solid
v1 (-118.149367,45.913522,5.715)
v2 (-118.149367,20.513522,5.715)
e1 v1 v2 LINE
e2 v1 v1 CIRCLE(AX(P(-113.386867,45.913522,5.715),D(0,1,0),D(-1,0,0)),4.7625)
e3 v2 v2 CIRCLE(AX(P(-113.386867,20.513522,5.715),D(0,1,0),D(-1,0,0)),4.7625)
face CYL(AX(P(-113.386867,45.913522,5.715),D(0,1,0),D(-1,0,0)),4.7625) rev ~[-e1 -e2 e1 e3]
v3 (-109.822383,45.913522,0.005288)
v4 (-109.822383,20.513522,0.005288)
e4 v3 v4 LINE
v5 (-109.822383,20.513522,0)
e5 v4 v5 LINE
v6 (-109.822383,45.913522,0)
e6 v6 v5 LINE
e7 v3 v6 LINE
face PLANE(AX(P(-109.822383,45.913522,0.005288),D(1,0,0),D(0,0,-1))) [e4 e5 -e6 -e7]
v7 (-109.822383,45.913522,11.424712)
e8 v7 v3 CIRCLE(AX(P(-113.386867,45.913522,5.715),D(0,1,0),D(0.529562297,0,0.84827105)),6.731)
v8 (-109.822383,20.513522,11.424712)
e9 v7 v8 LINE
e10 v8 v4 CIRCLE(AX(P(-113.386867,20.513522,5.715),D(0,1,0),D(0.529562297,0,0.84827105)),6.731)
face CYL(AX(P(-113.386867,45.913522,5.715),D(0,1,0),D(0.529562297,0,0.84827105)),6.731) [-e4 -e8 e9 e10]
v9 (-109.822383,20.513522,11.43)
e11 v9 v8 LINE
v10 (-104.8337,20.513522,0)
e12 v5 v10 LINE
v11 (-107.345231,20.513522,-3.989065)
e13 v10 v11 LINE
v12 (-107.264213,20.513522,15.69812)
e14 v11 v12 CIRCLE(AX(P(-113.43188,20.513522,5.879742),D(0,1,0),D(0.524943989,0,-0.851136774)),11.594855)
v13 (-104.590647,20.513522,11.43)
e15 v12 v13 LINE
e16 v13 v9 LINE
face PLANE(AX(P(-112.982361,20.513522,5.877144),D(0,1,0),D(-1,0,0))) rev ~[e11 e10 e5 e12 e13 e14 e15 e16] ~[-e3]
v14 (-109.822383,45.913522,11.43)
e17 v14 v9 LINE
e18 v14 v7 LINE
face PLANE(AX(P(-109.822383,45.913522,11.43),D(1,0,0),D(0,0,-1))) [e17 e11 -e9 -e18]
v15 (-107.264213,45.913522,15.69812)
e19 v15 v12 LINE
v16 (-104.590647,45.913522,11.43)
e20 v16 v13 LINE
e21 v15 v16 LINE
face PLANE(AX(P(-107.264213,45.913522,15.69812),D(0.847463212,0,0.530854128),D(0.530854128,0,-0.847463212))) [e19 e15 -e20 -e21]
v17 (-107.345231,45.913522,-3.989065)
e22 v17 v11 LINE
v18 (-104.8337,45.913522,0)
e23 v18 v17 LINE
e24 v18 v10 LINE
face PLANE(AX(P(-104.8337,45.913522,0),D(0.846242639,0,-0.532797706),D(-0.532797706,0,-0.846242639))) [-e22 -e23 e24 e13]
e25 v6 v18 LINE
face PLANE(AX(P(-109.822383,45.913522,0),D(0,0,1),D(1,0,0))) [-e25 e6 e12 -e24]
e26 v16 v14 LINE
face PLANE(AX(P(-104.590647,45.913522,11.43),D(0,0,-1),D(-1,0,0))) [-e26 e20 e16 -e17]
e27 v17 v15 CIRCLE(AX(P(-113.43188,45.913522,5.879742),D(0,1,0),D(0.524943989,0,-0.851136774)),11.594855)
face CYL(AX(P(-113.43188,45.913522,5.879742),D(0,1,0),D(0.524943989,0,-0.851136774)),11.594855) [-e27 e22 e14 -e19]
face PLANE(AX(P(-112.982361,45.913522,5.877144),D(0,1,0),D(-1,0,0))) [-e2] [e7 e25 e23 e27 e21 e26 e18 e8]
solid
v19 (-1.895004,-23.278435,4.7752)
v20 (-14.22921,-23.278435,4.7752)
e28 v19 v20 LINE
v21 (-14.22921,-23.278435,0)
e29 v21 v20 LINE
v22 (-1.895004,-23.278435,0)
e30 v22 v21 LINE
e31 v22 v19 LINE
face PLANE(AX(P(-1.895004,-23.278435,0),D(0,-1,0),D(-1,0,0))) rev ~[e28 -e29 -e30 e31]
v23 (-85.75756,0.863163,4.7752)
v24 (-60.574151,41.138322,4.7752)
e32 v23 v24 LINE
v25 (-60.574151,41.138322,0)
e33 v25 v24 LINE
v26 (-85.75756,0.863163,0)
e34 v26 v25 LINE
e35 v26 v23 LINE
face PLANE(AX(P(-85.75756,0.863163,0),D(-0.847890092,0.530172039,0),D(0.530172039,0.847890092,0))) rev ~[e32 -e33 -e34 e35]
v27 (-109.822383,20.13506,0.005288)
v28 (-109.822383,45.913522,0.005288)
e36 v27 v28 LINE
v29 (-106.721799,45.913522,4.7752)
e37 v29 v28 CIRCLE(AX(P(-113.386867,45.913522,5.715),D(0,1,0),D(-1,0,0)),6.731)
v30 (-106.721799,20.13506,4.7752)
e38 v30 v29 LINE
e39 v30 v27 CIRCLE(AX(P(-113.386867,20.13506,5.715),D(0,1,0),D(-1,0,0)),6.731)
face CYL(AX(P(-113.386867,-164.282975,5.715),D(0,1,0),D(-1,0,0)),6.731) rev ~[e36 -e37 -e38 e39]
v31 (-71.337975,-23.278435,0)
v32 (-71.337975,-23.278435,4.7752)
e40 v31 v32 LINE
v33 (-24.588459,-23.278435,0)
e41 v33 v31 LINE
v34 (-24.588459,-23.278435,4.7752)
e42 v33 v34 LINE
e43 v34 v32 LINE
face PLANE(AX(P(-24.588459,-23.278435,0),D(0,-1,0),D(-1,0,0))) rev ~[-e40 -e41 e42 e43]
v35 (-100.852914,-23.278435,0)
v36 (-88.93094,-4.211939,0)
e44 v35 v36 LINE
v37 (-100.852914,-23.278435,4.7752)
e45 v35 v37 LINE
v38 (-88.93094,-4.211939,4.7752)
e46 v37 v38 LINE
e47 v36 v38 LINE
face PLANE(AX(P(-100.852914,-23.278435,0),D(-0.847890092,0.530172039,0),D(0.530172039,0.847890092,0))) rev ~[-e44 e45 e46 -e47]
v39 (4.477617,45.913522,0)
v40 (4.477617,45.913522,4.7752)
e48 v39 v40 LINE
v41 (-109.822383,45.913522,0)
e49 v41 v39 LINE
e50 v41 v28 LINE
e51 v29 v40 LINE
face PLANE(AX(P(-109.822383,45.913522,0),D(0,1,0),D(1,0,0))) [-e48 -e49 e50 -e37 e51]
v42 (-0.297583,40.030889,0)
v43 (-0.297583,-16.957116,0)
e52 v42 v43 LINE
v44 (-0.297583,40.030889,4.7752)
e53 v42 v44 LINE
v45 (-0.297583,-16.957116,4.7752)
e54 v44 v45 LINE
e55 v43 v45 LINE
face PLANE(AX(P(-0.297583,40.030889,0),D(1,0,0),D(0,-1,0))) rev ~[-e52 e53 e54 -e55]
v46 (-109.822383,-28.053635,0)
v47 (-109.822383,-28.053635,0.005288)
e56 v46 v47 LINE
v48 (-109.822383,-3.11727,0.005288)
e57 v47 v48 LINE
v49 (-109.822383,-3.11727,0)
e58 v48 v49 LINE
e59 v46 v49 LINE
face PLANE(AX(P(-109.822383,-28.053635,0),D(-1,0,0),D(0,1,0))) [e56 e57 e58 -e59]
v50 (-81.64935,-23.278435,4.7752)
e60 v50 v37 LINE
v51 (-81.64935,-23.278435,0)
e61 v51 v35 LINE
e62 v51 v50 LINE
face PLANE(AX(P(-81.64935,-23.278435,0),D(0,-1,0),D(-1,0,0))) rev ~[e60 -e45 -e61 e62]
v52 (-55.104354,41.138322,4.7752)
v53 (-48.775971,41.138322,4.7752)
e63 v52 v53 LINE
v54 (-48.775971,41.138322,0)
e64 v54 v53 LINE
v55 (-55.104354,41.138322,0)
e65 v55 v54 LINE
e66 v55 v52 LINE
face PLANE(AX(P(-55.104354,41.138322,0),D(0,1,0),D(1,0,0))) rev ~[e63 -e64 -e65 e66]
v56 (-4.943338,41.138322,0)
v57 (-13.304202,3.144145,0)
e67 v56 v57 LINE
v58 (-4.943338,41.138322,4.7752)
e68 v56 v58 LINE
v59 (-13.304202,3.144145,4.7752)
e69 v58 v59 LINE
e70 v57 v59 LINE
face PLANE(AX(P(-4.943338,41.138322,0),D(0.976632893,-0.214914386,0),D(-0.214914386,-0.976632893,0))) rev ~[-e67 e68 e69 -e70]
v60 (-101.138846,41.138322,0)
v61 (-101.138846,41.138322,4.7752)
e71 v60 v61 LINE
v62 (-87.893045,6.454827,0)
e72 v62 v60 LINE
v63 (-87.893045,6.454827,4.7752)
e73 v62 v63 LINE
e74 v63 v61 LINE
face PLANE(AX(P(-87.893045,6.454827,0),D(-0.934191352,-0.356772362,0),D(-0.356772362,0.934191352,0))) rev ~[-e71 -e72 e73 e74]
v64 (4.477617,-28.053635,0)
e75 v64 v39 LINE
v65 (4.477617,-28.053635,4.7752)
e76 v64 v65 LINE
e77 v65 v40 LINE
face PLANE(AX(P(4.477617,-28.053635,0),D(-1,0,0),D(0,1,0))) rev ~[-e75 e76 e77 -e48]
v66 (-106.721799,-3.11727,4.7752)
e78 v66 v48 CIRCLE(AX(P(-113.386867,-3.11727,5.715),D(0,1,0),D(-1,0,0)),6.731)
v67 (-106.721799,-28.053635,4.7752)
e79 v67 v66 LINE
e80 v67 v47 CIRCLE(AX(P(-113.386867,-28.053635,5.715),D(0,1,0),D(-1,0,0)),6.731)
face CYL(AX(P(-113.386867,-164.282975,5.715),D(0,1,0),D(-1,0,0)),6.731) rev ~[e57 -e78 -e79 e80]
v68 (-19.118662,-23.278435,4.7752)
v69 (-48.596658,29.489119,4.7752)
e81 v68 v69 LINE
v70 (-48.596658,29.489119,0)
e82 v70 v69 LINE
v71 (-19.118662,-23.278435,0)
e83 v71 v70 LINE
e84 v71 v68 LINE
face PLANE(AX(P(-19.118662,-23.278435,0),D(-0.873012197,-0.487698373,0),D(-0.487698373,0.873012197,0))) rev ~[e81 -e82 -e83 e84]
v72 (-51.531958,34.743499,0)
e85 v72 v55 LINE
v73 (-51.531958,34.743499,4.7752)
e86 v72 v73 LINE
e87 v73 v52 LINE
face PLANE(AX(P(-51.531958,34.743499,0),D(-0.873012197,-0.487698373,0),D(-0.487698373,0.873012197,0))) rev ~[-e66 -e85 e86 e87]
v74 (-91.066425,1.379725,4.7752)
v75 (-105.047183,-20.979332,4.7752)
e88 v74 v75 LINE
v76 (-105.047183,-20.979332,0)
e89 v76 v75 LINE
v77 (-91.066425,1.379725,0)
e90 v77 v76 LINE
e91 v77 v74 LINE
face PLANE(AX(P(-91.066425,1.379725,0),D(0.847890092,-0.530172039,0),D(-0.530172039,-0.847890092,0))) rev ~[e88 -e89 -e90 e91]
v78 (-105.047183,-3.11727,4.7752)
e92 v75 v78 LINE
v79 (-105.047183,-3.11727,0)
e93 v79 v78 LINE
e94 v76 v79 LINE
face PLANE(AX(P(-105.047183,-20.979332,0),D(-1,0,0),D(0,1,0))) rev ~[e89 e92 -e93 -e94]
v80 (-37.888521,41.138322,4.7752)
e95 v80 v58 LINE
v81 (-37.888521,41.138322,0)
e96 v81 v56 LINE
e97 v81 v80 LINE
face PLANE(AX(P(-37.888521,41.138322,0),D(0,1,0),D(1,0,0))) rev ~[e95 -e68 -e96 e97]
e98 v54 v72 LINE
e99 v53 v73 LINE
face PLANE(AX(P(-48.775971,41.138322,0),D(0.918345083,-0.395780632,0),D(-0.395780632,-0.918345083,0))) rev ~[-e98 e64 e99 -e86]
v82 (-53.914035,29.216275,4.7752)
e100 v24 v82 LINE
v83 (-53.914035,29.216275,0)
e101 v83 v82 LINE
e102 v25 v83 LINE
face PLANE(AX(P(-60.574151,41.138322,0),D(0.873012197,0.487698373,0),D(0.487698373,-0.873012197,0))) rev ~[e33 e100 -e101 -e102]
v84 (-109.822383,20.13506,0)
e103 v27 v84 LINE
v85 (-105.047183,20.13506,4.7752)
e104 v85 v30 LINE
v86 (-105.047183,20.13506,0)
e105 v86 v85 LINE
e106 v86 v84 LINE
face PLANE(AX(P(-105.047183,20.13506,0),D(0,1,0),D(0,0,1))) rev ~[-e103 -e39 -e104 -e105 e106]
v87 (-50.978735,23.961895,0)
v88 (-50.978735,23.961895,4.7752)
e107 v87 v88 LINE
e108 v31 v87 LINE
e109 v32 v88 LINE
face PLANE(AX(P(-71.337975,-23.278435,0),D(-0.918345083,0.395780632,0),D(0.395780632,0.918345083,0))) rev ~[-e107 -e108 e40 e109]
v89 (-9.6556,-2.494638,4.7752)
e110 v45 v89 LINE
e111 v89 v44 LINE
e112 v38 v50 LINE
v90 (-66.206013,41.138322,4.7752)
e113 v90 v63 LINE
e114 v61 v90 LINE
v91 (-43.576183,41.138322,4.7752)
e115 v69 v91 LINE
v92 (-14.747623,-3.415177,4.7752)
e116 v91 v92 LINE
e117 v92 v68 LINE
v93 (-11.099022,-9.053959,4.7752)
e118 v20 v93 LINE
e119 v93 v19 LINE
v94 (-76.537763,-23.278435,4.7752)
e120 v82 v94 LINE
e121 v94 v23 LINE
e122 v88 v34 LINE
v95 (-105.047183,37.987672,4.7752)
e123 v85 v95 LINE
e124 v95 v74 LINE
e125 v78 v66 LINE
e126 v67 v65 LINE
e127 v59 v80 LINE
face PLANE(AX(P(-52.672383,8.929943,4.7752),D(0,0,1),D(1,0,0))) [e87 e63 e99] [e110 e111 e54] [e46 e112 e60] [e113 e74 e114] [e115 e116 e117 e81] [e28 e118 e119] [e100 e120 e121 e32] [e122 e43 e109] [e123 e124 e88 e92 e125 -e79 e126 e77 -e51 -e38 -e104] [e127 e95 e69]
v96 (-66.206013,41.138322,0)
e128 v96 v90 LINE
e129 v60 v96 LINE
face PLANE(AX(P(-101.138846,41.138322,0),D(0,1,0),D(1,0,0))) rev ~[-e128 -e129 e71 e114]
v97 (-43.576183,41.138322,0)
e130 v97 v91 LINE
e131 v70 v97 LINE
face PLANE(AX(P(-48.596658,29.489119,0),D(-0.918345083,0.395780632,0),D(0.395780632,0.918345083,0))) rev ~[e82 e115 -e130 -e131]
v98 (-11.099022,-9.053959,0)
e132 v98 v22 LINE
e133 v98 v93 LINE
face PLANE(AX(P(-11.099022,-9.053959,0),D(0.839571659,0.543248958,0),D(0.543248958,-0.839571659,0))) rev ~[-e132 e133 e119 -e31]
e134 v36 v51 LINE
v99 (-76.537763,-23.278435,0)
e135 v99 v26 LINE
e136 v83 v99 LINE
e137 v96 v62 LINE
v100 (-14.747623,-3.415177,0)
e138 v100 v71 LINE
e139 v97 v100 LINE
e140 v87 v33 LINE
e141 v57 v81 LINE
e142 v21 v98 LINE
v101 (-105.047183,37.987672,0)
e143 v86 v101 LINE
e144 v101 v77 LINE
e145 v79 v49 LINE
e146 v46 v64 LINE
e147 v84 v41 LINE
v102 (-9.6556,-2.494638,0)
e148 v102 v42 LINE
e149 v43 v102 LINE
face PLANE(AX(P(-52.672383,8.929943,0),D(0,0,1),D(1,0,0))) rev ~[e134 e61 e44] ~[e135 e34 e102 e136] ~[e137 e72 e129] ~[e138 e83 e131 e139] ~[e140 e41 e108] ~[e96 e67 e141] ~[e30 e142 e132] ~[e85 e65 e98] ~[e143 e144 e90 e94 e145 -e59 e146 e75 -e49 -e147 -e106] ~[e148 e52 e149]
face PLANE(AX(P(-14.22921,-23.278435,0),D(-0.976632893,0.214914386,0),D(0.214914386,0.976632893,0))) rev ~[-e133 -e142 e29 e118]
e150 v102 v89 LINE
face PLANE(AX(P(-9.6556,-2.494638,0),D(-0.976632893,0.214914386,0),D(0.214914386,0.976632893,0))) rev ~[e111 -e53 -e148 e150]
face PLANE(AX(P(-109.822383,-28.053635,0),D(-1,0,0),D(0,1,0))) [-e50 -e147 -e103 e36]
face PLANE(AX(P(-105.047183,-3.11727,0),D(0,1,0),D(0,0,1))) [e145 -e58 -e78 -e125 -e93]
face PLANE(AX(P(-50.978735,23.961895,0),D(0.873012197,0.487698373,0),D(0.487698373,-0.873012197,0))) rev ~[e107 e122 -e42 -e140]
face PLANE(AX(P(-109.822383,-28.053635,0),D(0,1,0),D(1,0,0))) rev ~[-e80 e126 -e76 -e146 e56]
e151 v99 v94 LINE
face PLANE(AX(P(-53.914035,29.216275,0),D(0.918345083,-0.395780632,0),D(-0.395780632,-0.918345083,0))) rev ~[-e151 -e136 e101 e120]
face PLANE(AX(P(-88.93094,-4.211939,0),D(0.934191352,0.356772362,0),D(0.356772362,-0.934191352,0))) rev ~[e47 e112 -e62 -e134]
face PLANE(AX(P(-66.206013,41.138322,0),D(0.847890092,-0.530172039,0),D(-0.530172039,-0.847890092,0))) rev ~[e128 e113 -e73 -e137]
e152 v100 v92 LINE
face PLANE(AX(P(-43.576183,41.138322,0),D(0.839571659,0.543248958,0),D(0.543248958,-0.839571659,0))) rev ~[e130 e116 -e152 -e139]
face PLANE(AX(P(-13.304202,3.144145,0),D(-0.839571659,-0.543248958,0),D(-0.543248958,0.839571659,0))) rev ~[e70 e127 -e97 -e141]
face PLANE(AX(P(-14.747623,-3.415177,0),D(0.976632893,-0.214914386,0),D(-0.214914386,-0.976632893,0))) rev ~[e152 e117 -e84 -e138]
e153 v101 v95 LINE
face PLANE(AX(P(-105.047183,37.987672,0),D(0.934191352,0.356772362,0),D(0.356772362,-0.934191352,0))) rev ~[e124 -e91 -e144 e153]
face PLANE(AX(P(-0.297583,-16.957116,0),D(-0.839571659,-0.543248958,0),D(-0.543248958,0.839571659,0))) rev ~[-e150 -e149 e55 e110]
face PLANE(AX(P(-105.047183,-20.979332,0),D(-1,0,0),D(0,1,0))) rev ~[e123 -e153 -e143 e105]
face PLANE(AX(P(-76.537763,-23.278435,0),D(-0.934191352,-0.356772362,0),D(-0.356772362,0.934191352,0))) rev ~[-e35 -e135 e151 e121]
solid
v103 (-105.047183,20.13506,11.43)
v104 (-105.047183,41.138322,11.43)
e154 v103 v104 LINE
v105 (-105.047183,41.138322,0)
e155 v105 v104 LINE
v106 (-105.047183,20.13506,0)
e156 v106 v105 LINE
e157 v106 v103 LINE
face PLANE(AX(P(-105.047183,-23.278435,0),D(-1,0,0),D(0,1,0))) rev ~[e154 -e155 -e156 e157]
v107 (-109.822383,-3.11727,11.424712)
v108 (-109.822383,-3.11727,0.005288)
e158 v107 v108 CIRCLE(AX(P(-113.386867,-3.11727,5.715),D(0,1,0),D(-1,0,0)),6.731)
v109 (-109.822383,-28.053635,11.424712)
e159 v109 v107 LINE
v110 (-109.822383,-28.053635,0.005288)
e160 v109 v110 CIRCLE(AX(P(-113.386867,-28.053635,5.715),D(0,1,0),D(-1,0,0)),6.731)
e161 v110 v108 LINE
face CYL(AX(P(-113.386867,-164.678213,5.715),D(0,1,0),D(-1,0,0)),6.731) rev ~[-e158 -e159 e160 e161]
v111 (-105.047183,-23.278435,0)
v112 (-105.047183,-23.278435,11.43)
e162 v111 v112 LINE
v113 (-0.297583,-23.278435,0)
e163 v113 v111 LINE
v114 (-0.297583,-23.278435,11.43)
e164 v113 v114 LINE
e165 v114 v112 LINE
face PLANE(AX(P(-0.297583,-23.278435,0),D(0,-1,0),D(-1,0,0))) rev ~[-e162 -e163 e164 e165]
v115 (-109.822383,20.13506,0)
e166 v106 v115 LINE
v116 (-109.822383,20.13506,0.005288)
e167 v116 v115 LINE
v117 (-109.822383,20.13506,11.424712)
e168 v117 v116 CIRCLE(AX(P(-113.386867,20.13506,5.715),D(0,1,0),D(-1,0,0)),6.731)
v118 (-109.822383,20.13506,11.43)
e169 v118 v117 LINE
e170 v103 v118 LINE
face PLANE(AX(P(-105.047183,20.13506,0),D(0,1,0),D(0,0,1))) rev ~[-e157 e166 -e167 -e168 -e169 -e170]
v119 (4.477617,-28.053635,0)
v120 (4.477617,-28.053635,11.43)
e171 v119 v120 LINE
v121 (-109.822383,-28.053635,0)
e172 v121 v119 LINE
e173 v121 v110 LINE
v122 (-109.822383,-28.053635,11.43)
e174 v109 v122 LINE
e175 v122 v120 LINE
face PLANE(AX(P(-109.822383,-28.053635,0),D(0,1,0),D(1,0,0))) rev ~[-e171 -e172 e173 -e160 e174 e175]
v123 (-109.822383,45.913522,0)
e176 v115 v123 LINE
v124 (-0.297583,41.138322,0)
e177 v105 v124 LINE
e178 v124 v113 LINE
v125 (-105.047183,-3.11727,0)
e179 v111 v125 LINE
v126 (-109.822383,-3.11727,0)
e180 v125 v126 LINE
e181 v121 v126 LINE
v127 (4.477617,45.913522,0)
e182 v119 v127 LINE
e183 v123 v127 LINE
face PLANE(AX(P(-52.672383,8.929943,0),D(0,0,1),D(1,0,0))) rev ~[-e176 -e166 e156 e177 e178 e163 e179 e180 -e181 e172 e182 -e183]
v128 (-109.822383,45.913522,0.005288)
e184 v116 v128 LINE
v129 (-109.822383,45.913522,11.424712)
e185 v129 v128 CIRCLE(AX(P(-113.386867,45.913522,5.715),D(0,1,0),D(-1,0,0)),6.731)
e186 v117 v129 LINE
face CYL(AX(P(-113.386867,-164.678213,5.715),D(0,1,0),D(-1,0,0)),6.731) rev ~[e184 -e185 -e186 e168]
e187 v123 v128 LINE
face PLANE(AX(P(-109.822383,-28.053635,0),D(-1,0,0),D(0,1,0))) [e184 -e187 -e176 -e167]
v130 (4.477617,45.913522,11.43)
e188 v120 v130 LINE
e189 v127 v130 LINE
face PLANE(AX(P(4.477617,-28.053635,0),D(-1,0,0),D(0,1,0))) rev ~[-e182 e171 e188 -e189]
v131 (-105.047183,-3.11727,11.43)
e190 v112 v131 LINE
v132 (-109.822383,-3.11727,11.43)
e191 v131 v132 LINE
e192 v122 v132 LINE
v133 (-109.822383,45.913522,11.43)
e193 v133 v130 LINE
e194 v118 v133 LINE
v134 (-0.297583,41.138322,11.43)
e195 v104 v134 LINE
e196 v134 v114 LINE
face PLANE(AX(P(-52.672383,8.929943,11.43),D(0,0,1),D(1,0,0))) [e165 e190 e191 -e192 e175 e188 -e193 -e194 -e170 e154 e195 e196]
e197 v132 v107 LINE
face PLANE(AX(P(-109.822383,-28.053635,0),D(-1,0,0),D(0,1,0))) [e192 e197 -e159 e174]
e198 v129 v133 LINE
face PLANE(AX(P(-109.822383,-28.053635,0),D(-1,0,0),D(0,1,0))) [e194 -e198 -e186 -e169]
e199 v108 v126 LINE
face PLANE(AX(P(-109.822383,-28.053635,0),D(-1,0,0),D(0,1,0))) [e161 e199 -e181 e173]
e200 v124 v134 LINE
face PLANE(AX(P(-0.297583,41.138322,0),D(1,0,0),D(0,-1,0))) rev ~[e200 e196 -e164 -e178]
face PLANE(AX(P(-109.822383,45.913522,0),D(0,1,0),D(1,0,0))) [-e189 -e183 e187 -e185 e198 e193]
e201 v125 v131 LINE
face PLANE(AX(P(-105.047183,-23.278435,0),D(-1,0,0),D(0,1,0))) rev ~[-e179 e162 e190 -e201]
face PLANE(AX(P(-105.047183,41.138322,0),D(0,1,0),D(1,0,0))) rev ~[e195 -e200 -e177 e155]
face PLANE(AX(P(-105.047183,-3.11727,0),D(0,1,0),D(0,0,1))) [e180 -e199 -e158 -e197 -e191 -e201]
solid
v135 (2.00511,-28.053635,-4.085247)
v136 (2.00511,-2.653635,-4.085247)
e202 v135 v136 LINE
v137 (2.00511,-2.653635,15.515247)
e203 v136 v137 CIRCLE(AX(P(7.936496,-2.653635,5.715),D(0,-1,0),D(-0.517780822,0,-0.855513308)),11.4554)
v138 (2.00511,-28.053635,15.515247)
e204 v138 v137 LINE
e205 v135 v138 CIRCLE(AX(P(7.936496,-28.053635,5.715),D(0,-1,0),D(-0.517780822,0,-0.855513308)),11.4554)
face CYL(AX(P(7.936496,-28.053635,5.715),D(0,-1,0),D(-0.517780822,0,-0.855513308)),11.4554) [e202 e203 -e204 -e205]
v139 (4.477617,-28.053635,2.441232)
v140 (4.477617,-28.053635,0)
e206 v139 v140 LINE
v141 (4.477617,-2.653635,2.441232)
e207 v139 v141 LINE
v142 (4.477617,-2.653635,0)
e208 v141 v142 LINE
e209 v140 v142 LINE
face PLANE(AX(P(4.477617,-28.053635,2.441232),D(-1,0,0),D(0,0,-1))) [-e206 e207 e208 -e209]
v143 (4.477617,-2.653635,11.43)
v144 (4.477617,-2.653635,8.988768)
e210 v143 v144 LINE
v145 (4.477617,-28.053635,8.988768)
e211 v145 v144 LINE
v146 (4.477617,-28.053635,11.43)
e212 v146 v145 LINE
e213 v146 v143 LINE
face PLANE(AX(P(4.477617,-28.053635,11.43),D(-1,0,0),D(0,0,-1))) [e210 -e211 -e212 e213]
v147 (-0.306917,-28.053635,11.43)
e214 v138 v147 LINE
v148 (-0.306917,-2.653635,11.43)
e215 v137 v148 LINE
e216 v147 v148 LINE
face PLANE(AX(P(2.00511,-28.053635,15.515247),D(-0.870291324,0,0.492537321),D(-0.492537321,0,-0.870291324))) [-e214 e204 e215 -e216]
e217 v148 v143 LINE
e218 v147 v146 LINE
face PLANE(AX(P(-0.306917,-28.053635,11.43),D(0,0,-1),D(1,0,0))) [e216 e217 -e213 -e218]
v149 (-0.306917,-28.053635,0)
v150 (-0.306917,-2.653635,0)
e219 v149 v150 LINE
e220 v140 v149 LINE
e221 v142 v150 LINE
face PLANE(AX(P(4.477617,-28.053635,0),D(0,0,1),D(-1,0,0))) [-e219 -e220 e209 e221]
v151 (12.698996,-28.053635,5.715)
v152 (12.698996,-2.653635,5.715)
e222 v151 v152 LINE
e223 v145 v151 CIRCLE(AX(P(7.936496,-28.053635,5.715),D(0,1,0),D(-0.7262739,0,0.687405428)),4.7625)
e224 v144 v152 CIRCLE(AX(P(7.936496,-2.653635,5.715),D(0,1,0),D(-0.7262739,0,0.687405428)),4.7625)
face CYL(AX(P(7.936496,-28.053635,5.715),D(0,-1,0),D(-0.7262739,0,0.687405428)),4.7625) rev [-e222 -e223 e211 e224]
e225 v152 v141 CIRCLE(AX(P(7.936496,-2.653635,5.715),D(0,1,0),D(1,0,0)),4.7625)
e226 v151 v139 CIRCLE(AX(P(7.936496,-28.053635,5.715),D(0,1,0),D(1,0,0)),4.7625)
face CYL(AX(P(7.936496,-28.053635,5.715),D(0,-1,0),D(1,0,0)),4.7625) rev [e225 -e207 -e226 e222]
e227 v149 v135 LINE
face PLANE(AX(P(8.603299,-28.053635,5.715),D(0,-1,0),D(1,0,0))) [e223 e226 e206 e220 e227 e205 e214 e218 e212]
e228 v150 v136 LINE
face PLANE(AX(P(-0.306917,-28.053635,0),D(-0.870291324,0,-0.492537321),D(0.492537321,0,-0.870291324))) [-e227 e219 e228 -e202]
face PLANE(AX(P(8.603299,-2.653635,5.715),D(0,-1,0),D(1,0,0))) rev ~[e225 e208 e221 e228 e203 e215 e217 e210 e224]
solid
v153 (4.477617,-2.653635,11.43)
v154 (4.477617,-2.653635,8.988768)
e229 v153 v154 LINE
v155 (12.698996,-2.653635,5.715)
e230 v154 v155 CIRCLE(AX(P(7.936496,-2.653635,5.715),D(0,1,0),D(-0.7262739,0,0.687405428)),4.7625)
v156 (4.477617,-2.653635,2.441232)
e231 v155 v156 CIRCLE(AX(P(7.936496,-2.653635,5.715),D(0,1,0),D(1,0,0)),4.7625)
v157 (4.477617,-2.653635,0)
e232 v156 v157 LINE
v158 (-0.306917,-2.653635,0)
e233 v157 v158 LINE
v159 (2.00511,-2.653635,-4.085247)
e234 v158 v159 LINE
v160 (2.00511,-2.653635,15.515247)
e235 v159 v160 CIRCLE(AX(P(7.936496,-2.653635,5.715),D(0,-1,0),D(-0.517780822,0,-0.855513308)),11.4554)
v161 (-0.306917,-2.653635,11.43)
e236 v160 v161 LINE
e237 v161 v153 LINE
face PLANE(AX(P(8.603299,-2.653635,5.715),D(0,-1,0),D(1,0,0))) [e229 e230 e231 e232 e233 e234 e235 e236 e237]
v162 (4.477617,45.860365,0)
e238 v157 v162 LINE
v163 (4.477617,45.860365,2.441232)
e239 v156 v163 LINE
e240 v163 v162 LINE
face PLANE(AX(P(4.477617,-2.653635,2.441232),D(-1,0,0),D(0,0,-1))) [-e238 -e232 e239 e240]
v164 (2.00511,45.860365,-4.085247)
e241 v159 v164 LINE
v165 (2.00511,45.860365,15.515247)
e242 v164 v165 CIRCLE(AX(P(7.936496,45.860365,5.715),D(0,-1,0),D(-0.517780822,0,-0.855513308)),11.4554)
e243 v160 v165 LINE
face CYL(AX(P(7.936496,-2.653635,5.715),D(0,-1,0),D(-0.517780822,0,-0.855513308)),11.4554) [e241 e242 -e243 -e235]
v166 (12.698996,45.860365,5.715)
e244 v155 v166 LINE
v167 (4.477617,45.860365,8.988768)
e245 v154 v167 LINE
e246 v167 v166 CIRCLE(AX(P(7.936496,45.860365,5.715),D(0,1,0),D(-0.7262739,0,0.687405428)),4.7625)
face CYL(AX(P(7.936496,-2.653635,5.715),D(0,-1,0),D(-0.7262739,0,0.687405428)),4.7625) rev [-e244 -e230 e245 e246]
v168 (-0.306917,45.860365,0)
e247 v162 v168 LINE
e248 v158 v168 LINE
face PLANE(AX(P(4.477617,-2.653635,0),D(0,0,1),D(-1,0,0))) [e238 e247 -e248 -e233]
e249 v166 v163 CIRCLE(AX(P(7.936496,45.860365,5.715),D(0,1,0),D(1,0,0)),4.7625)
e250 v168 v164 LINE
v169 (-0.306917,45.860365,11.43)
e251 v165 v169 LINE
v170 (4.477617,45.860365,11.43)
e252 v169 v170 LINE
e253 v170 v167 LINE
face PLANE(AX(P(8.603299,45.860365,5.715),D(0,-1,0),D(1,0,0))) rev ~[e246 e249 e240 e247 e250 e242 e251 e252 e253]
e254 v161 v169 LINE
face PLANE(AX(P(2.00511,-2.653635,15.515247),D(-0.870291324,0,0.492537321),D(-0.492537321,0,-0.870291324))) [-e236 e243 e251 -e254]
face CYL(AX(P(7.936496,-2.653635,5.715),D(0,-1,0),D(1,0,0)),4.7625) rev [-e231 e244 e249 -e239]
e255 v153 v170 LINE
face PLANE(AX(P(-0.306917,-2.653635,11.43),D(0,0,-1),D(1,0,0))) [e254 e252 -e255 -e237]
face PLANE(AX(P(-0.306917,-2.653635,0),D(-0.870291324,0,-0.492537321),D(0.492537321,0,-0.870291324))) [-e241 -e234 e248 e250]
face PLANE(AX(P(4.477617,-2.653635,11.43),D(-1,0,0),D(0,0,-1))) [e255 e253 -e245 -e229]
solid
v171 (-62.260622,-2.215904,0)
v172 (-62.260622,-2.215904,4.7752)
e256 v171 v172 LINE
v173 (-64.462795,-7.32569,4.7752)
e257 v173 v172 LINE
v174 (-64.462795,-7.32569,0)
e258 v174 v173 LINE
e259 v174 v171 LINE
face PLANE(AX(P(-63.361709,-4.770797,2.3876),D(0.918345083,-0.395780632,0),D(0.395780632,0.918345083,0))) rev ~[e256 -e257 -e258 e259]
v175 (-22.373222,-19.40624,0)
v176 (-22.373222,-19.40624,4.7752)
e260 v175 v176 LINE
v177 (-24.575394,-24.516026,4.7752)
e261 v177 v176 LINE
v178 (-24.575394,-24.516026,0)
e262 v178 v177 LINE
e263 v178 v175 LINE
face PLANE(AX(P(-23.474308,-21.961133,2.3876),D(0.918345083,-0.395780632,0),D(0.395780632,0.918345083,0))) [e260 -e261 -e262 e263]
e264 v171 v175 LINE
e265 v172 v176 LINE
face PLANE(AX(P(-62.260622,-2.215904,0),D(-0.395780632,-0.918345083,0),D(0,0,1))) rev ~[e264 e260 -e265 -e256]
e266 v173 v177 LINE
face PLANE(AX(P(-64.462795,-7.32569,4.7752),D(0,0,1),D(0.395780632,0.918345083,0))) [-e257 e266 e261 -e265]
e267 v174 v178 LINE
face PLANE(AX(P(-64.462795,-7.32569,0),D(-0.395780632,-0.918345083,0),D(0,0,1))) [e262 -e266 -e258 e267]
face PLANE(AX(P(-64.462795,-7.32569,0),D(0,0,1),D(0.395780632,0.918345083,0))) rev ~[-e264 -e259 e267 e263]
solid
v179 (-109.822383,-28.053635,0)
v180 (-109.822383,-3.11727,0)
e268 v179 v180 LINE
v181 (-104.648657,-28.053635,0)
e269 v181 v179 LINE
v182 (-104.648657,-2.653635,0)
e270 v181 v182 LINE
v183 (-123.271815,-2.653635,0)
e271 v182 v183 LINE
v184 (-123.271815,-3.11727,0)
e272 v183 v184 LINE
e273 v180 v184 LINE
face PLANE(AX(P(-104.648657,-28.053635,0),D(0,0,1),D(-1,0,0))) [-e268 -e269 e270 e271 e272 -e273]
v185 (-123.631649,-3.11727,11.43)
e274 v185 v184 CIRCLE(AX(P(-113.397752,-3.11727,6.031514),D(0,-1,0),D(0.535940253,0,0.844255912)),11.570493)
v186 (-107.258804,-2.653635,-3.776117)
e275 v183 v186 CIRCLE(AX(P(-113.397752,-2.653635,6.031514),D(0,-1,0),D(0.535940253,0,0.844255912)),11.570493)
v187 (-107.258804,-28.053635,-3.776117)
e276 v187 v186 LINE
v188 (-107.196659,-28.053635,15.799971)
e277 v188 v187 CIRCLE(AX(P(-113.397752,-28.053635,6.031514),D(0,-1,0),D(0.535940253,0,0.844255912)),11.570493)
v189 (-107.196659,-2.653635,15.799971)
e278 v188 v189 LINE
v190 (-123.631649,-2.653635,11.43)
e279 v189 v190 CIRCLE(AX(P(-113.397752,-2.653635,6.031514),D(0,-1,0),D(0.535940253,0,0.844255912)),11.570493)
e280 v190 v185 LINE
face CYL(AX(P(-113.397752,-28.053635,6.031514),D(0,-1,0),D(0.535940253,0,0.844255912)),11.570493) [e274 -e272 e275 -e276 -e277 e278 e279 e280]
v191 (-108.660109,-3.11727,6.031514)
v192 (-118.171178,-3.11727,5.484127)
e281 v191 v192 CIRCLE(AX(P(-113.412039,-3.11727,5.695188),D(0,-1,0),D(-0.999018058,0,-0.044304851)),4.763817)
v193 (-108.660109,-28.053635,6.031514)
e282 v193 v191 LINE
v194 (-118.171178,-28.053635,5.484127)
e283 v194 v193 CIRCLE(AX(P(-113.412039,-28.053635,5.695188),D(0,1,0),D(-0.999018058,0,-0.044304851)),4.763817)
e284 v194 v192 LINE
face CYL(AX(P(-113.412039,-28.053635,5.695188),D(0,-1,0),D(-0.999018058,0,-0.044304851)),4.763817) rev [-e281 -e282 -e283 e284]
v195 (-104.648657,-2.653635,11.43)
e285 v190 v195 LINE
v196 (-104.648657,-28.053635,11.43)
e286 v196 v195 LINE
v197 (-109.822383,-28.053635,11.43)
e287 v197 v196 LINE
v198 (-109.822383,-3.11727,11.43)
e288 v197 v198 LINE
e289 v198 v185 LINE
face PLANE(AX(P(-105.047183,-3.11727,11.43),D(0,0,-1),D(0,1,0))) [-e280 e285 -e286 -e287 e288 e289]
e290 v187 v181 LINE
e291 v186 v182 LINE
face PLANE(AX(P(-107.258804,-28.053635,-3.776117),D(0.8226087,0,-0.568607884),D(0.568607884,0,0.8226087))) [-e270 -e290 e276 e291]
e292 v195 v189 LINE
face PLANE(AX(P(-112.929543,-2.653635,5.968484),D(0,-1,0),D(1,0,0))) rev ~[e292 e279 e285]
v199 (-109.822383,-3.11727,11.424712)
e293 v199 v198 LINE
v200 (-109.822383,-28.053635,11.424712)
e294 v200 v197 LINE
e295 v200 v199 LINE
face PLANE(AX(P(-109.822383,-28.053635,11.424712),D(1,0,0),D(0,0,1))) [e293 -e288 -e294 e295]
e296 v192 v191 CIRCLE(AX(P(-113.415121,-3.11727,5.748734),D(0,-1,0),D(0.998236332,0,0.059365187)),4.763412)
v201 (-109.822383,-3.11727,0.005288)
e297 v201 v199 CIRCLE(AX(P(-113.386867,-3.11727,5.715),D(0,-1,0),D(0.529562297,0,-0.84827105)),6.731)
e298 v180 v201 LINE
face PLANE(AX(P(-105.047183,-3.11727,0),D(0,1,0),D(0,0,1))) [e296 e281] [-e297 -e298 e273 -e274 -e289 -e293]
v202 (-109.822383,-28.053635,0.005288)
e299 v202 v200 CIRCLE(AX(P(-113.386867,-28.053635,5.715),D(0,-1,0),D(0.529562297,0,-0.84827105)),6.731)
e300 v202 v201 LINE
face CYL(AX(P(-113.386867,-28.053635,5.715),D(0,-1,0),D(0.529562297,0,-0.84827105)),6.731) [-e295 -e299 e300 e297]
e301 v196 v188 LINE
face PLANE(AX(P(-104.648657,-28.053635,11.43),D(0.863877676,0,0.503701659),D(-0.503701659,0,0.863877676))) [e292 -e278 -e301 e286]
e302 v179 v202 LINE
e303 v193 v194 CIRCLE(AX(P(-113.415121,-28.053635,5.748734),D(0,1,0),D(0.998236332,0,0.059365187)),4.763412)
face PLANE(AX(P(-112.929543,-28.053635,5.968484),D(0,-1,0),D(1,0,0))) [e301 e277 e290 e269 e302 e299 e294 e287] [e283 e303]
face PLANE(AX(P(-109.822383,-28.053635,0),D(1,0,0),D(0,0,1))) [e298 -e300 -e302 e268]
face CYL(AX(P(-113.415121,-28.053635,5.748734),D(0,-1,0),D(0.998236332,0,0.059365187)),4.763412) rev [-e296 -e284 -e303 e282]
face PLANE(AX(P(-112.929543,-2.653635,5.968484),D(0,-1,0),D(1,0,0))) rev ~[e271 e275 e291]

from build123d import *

# Parameters (mm, degrees)
F0_W      = 114.3
F0_H      = 73.967157311
F1_DEPTH  = 4.7752
F2_DEPTH  = 11.43
F4_D      = 13.462
F4_2_D    = 13.462
F5_R      = 4.7625
F6_DEPTH  = 25.4
F8_DEPTH  = 25.4
F9_W      = 23.2523302548
F9_H      = 11.43
F10_DEPTH = 25.4
F11_W     = 5.5641233921
F11_H     = 4.7752
F12_DEPTH = 43.434
F13_DEPTH = 48.514


# Not quite as in the source:
# - a feature names something its author has since deleted; it is built from what else it names


with BuildPart() as f1:
    # F0 (on Top) → F1 (new body)
    with BuildSketch(Plane.XY):
        with Locations((-52.6723831377, 8.9299433027)):
            Rectangle(F0_W, F0_H)
        Polygon((-105.0471831377, 37.9876717925), (-105.0471831377, 41.1383219582), (-101.1388456313, 41.1383219582), (-66.2060131753, 41.1383219582), (-60.5741511644, 41.1383219582), (-55.1043535892, 41.1383219582), (-48.7759712627, 41.1383219582), (-43.5761829824, 41.1383219582), (-37.8885207676, 41.1383219582), (-10.4127929617, 41.1383219582), (-9.5890923762, 41.1383219582), (-5.273707792, 41.1383219582), (-4.9433377569, 41.1383219582), (-0.2975831377, 41.1383219582), (-0.2975831377, 40.0308892131), (-0.2975831377, -16.9571155447), (-0.2975831377, -23.2784353529), (-1.8950043824, -23.2784353529), (-14.22920956, -23.2784353529), (-19.1186619188, -23.2784353529), (-24.5884594941, -23.2784353529), (-36.035214648, -23.2784353529), (-42.7883672511, -23.2784353529), (-71.3379746857, -23.2784353529), (-76.537762966, -23.2784353529), (-81.6493495712, -23.2784353529), (-100.8529136018, -23.2784353529), (-105.0471831377, -23.2784353529), (-105.0471831377, -20.9793318063), align=None, mode=Mode.SUBTRACT)
        Polygon((-48.5966583669, 29.4891190576), (-50.9787348492, 23.9618950121), (-24.5884594941, -23.2784353529), (-19.1186619188, -23.2784353529), align=None)
        Polygon((-50.9787348492, 23.9618950121), (-53.9140346901, 29.2162749813), (-76.537762966, -23.2784353529), (-71.3379746857, -23.2784353529), align=None)
        Polygon((-37.8885207676, 41.1383219582), (-43.5761829824, 41.1383219582), (-14.7476233332, -3.4151765974), (-13.304202216, 3.1441448502), align=None)
        Polygon((-60.5741511644, 41.1383219582), (-66.2060131753, 41.1383219582), (-87.8930449112, 6.4548268458), (-85.7575604218, 0.8631629356), align=None)
        Polygon((-4.9433377569, 41.1383219582), (-13.304202216, 3.1441448502), (-9.655600407, -2.4946375728), (-0.2975831377, 40.0308892131), (-0.2975831377, 41.1383219582), align=None)
        Polygon((-101.1388456313, 41.1383219582), (-105.0471831377, 41.1383219582), (-105.0471831377, 37.9876717925), (-91.0664245982, 1.3797248123), (-87.8930449112, 6.4548268458), align=None)
        Polygon((-91.0664245982, 1.3797248123), (-105.0471831377, -20.9793318063), (-105.0471831377, -23.2784353529), (-100.8529136018, -23.2784353529), (-88.9309401089, -4.2119390979), align=None)
        Polygon((-85.7575604218, 0.8631629356), (-88.9309401089, -4.2119390979), (-81.6493495712, -23.2784353529), (-76.537762966, -23.2784353529), align=None)
        Polygon((-9.655600407, -2.4946375728), (-11.0990215241, -9.0539590204), (-1.8950043824, -23.2784353529), (-0.2975831377, -23.2784353529), (-0.2975831377, -16.9571155447), align=None)
        Polygon((-11.0990215241, -9.0539590204), (-14.7476233332, -3.4151765974), (-19.1186619188, -23.2784353529), (-14.22920956, -23.2784353529), align=None)
        Polygon((-55.1043535892, 41.1383219582), (-60.5741511644, 41.1383219582), (-53.9140346901, 29.2162749813), (-51.5319582079, 34.7434990268), align=None)
        Polygon((-43.5761829824, 41.1383219582), (-48.7759712627, 41.1383219582), (-51.5319582079, 34.7434990268), (-48.5966583669, 29.4891190576), align=None)
        Polygon((-13.304202216, 3.1441448502), (-14.7476233332, -3.4151765974), (-11.0990215241, -9.0539590204), (-9.655600407, -2.4946375728), align=None)
        Polygon((-51.5319582079, 34.7434990268), (-53.9140346901, 29.2162749813), (-50.9787348492, 23.9618950121), (-48.5966583669, 29.4891190576), align=None)
        Polygon((-87.8930449112, 6.4548268458), (-91.0664245982, 1.3797248123), (-88.9309401089, -4.2119390979), (-85.7575604218, 0.8631629356), align=None)
    extrude(amount=F1_DEPTH)

    # F4 (through all)
    with Locations(Plane.XZ.offset(28.0536353529)):
        with Locations((-113.3868669575, 5.715)):
            Hole(F4_D / 2)


with BuildPart() as f2:
    # F0 (on Top) → F2 (new body)
    with BuildSketch(Plane.XY):
        with Locations((-52.6723831377, 8.9299433027)):
            Rectangle(F0_W, F0_H)
        Polygon((-105.0471831377, 37.9876717925), (-105.0471831377, 41.1383219582), (-101.1388456313, 41.1383219582), (-66.2060131753, 41.1383219582), (-60.5741511644, 41.1383219582), (-55.1043535892, 41.1383219582), (-48.7759712627, 41.1383219582), (-43.5761829824, 41.1383219582), (-37.8885207676, 41.1383219582), (-10.4127929617, 41.1383219582), (-9.5890923762, 41.1383219582), (-5.273707792, 41.1383219582), (-4.9433377569, 41.1383219582), (-0.2975831377, 41.1383219582), (-0.2975831377, 40.0308892131), (-0.2975831377, -16.9571155447), (-0.2975831377, -23.2784353529), (-1.8950043824, -23.2784353529), (-14.22920956, -23.2784353529), (-19.1186619188, -23.2784353529), (-24.5884594941, -23.2784353529), (-36.035214648, -23.2784353529), (-42.7883672511, -23.2784353529), (-71.3379746857, -23.2784353529), (-76.537762966, -23.2784353529), (-81.6493495712, -23.2784353529), (-100.8529136018, -23.2784353529), (-105.0471831377, -23.2784353529), (-105.0471831377, -20.9793318063), align=None, mode=Mode.SUBTRACT)
    extrude(amount=F2_DEPTH)

    # F4#2 (through all)
    with Locations(Plane.XZ.offset(28.0536353529)):
        with Locations((-113.3868669575, 5.715)):
            Hole(F4_2_D / 2)


with BuildPart() as f6:
    # F5 (on face) → F6 (new body)
    with BuildSketch(Plane(origin=(0, 45.9135219582, 0), x_dir=(-1, 0, 0), z_dir=(0, 1, 0))):
        with BuildLine():
            Line((104.8336997628, 0), (107.3452308774, -3.989065066))
            ThreePointArc((107.3452308774, -3.989065066), (125.0266367946, 5.9274575081), (107.264213264, 15.698119998))
            Line((107.264213264, 15.698119998), (104.5906469226, 11.43))
            Line((104.5906469226, 11.43), (109.8223831377, 11.43))
            Line((109.8223831377, 11.43), (109.8223831377, 11.4247124357))
            ThreePointArc((109.8223831377, 11.4247124357), (106.6558669575, 5.715), (109.8223831377, 0.0052875643))
            Line((109.8223831377, 0.0052875643), (109.8223831377, 0))
            Line((109.8223831377, 0), (104.8336997628, 0))
        make_face()
        with Locations((113.3868669575, 5.715)):
            Circle(F5_R, mode=Mode.SUBTRACT)
    extrude(amount=-F6_DEPTH)


with BuildPart() as f8:
    # F7 (on face) → F8 (new body)
    with BuildSketch(Plane.XZ.offset(28.0536353529)):
        with BuildLine():
            Line((-0.3069167142, 0), (2.00510988, -4.0852471483))
            ThreePointArc((2.00510988, -4.0852471483), (19.3918963109, 5.715), (2.00510988, 15.5152471483))
            Line((2.00510988, 15.5152471483), (-0.3069167142, 11.43))
            Line((-0.3069167142, 11.43), (4.4776168623, 11.43))
            Line((4.4776168623, 11.43), (4.4776168623, 8.9887683501))
            ThreePointArc((4.4776168623, 8.9887683501), (9.6983834917, 10.139608436), (12.6989963109, 5.715))
            ThreePointArc((12.6989963109, 5.715), (9.6983834917, 1.290391564), (4.4776168623, 2.4412316499))
            Line((4.4776168623, 2.4412316499), (4.4776168623, 0))
            Line((4.4776168623, 0), (-0.3069167142, 0))
        make_face()
    extrude(amount=-F8_DEPTH)


with BuildPart() as f8b:
    # F7 (on face) → F8, piece 2 (new body)
    with BuildSketch(Plane.XZ.offset(28.0536353529)):
        with BuildLine():
            Line((-107.2588041425, -3.7761165295), (-104.6486571431, 0))
            Line((-104.6486571431, 0), (-109.8223831377, 0))
            Line((-109.8223831377, 0), (-109.8223831377, 0.0052875643))
            ThreePointArc((-109.8223831377, 0.0052875643), (-106.6558669575, 5.715), (-109.8223831377, 11.4247124357))
            Line((-109.8223831377, 11.4247124357), (-109.8223831377, 11.43))
            Line((-109.8223831377, 11.43), (-104.6486571431, 11.43))
            Line((-104.6486571431, 11.43), (-107.1966588497, 15.7999712974))
            ThreePointArc((-107.1966588497, 15.7999712974), (-124.9681860406, 6.0682453649), (-107.2588041425, -3.7761165295))
        make_face()
        with BuildLine():
            ThreePointArc((-118.1711778045, 5.4841274396), (-113.6857560931, 10.451134302), (-108.6601093411, 6.0315144287))
            ThreePointArc((-108.6601093411, 6.0315144287), (-113.1414265767, 0.9931906529), (-118.1711778045, 5.4841274396))
        make_face(mode=Mode.SUBTRACT)
    extrude(amount=-F8_DEPTH)


with BuildPart() as f10_tool:
    # F9 (on face) → F10 (new body)
    with BuildSketch(Plane.YZ.offset(-105.0471831377)):
        with Locations((8.5088948254, 5.715)):
            Rectangle(F9_W, F9_H)
    extrude(amount=-F10_DEPTH)


with BuildPart() as f1_1:
    add(f1.part)

    # F10: cut by f10_tool
    add(f10_tool.part, mode=Mode.SUBTRACT)


with BuildPart() as f2_1:
    add(f2.part)

    # F10: cut by f10_tool
    add(f10_tool.part, mode=Mode.SUBTRACT)


with BuildPart() as f8b_1:
    add(f8b.part)

    # F10: cut by f10_tool
    add(f10_tool.part, mode=Mode.SUBTRACT)


with BuildPart() as f12:
    # F11 (on face) → F12 (new body)
    with BuildSketch(Plane(origin=(-51.702575109, 22.2823405061, 0), x_dir=(0.3957806318, 0.918345083, 0), z_dir=(0.918345083, -0.3957806318, 0))):
        with Locations((-29.4585749507, 2.3876)):
            Rectangle(F11_W, F11_H)
    extrude(amount=F12_DEPTH)


with BuildPart() as f13:
    # F13 (new): a face of the model
    f13_faces = [f8.part.faces().sort_by_distance(p)[0] for p in [
        (2.085350074, -2.6536353529, -0.3021502923),
    ]]
    extrude(f13_faces, amount=F13_DEPTH)


solid = Compound([f6.part, f8.part, f1_1.part, f2_1.part, f8b_1.part, f12.part, f13.part])
